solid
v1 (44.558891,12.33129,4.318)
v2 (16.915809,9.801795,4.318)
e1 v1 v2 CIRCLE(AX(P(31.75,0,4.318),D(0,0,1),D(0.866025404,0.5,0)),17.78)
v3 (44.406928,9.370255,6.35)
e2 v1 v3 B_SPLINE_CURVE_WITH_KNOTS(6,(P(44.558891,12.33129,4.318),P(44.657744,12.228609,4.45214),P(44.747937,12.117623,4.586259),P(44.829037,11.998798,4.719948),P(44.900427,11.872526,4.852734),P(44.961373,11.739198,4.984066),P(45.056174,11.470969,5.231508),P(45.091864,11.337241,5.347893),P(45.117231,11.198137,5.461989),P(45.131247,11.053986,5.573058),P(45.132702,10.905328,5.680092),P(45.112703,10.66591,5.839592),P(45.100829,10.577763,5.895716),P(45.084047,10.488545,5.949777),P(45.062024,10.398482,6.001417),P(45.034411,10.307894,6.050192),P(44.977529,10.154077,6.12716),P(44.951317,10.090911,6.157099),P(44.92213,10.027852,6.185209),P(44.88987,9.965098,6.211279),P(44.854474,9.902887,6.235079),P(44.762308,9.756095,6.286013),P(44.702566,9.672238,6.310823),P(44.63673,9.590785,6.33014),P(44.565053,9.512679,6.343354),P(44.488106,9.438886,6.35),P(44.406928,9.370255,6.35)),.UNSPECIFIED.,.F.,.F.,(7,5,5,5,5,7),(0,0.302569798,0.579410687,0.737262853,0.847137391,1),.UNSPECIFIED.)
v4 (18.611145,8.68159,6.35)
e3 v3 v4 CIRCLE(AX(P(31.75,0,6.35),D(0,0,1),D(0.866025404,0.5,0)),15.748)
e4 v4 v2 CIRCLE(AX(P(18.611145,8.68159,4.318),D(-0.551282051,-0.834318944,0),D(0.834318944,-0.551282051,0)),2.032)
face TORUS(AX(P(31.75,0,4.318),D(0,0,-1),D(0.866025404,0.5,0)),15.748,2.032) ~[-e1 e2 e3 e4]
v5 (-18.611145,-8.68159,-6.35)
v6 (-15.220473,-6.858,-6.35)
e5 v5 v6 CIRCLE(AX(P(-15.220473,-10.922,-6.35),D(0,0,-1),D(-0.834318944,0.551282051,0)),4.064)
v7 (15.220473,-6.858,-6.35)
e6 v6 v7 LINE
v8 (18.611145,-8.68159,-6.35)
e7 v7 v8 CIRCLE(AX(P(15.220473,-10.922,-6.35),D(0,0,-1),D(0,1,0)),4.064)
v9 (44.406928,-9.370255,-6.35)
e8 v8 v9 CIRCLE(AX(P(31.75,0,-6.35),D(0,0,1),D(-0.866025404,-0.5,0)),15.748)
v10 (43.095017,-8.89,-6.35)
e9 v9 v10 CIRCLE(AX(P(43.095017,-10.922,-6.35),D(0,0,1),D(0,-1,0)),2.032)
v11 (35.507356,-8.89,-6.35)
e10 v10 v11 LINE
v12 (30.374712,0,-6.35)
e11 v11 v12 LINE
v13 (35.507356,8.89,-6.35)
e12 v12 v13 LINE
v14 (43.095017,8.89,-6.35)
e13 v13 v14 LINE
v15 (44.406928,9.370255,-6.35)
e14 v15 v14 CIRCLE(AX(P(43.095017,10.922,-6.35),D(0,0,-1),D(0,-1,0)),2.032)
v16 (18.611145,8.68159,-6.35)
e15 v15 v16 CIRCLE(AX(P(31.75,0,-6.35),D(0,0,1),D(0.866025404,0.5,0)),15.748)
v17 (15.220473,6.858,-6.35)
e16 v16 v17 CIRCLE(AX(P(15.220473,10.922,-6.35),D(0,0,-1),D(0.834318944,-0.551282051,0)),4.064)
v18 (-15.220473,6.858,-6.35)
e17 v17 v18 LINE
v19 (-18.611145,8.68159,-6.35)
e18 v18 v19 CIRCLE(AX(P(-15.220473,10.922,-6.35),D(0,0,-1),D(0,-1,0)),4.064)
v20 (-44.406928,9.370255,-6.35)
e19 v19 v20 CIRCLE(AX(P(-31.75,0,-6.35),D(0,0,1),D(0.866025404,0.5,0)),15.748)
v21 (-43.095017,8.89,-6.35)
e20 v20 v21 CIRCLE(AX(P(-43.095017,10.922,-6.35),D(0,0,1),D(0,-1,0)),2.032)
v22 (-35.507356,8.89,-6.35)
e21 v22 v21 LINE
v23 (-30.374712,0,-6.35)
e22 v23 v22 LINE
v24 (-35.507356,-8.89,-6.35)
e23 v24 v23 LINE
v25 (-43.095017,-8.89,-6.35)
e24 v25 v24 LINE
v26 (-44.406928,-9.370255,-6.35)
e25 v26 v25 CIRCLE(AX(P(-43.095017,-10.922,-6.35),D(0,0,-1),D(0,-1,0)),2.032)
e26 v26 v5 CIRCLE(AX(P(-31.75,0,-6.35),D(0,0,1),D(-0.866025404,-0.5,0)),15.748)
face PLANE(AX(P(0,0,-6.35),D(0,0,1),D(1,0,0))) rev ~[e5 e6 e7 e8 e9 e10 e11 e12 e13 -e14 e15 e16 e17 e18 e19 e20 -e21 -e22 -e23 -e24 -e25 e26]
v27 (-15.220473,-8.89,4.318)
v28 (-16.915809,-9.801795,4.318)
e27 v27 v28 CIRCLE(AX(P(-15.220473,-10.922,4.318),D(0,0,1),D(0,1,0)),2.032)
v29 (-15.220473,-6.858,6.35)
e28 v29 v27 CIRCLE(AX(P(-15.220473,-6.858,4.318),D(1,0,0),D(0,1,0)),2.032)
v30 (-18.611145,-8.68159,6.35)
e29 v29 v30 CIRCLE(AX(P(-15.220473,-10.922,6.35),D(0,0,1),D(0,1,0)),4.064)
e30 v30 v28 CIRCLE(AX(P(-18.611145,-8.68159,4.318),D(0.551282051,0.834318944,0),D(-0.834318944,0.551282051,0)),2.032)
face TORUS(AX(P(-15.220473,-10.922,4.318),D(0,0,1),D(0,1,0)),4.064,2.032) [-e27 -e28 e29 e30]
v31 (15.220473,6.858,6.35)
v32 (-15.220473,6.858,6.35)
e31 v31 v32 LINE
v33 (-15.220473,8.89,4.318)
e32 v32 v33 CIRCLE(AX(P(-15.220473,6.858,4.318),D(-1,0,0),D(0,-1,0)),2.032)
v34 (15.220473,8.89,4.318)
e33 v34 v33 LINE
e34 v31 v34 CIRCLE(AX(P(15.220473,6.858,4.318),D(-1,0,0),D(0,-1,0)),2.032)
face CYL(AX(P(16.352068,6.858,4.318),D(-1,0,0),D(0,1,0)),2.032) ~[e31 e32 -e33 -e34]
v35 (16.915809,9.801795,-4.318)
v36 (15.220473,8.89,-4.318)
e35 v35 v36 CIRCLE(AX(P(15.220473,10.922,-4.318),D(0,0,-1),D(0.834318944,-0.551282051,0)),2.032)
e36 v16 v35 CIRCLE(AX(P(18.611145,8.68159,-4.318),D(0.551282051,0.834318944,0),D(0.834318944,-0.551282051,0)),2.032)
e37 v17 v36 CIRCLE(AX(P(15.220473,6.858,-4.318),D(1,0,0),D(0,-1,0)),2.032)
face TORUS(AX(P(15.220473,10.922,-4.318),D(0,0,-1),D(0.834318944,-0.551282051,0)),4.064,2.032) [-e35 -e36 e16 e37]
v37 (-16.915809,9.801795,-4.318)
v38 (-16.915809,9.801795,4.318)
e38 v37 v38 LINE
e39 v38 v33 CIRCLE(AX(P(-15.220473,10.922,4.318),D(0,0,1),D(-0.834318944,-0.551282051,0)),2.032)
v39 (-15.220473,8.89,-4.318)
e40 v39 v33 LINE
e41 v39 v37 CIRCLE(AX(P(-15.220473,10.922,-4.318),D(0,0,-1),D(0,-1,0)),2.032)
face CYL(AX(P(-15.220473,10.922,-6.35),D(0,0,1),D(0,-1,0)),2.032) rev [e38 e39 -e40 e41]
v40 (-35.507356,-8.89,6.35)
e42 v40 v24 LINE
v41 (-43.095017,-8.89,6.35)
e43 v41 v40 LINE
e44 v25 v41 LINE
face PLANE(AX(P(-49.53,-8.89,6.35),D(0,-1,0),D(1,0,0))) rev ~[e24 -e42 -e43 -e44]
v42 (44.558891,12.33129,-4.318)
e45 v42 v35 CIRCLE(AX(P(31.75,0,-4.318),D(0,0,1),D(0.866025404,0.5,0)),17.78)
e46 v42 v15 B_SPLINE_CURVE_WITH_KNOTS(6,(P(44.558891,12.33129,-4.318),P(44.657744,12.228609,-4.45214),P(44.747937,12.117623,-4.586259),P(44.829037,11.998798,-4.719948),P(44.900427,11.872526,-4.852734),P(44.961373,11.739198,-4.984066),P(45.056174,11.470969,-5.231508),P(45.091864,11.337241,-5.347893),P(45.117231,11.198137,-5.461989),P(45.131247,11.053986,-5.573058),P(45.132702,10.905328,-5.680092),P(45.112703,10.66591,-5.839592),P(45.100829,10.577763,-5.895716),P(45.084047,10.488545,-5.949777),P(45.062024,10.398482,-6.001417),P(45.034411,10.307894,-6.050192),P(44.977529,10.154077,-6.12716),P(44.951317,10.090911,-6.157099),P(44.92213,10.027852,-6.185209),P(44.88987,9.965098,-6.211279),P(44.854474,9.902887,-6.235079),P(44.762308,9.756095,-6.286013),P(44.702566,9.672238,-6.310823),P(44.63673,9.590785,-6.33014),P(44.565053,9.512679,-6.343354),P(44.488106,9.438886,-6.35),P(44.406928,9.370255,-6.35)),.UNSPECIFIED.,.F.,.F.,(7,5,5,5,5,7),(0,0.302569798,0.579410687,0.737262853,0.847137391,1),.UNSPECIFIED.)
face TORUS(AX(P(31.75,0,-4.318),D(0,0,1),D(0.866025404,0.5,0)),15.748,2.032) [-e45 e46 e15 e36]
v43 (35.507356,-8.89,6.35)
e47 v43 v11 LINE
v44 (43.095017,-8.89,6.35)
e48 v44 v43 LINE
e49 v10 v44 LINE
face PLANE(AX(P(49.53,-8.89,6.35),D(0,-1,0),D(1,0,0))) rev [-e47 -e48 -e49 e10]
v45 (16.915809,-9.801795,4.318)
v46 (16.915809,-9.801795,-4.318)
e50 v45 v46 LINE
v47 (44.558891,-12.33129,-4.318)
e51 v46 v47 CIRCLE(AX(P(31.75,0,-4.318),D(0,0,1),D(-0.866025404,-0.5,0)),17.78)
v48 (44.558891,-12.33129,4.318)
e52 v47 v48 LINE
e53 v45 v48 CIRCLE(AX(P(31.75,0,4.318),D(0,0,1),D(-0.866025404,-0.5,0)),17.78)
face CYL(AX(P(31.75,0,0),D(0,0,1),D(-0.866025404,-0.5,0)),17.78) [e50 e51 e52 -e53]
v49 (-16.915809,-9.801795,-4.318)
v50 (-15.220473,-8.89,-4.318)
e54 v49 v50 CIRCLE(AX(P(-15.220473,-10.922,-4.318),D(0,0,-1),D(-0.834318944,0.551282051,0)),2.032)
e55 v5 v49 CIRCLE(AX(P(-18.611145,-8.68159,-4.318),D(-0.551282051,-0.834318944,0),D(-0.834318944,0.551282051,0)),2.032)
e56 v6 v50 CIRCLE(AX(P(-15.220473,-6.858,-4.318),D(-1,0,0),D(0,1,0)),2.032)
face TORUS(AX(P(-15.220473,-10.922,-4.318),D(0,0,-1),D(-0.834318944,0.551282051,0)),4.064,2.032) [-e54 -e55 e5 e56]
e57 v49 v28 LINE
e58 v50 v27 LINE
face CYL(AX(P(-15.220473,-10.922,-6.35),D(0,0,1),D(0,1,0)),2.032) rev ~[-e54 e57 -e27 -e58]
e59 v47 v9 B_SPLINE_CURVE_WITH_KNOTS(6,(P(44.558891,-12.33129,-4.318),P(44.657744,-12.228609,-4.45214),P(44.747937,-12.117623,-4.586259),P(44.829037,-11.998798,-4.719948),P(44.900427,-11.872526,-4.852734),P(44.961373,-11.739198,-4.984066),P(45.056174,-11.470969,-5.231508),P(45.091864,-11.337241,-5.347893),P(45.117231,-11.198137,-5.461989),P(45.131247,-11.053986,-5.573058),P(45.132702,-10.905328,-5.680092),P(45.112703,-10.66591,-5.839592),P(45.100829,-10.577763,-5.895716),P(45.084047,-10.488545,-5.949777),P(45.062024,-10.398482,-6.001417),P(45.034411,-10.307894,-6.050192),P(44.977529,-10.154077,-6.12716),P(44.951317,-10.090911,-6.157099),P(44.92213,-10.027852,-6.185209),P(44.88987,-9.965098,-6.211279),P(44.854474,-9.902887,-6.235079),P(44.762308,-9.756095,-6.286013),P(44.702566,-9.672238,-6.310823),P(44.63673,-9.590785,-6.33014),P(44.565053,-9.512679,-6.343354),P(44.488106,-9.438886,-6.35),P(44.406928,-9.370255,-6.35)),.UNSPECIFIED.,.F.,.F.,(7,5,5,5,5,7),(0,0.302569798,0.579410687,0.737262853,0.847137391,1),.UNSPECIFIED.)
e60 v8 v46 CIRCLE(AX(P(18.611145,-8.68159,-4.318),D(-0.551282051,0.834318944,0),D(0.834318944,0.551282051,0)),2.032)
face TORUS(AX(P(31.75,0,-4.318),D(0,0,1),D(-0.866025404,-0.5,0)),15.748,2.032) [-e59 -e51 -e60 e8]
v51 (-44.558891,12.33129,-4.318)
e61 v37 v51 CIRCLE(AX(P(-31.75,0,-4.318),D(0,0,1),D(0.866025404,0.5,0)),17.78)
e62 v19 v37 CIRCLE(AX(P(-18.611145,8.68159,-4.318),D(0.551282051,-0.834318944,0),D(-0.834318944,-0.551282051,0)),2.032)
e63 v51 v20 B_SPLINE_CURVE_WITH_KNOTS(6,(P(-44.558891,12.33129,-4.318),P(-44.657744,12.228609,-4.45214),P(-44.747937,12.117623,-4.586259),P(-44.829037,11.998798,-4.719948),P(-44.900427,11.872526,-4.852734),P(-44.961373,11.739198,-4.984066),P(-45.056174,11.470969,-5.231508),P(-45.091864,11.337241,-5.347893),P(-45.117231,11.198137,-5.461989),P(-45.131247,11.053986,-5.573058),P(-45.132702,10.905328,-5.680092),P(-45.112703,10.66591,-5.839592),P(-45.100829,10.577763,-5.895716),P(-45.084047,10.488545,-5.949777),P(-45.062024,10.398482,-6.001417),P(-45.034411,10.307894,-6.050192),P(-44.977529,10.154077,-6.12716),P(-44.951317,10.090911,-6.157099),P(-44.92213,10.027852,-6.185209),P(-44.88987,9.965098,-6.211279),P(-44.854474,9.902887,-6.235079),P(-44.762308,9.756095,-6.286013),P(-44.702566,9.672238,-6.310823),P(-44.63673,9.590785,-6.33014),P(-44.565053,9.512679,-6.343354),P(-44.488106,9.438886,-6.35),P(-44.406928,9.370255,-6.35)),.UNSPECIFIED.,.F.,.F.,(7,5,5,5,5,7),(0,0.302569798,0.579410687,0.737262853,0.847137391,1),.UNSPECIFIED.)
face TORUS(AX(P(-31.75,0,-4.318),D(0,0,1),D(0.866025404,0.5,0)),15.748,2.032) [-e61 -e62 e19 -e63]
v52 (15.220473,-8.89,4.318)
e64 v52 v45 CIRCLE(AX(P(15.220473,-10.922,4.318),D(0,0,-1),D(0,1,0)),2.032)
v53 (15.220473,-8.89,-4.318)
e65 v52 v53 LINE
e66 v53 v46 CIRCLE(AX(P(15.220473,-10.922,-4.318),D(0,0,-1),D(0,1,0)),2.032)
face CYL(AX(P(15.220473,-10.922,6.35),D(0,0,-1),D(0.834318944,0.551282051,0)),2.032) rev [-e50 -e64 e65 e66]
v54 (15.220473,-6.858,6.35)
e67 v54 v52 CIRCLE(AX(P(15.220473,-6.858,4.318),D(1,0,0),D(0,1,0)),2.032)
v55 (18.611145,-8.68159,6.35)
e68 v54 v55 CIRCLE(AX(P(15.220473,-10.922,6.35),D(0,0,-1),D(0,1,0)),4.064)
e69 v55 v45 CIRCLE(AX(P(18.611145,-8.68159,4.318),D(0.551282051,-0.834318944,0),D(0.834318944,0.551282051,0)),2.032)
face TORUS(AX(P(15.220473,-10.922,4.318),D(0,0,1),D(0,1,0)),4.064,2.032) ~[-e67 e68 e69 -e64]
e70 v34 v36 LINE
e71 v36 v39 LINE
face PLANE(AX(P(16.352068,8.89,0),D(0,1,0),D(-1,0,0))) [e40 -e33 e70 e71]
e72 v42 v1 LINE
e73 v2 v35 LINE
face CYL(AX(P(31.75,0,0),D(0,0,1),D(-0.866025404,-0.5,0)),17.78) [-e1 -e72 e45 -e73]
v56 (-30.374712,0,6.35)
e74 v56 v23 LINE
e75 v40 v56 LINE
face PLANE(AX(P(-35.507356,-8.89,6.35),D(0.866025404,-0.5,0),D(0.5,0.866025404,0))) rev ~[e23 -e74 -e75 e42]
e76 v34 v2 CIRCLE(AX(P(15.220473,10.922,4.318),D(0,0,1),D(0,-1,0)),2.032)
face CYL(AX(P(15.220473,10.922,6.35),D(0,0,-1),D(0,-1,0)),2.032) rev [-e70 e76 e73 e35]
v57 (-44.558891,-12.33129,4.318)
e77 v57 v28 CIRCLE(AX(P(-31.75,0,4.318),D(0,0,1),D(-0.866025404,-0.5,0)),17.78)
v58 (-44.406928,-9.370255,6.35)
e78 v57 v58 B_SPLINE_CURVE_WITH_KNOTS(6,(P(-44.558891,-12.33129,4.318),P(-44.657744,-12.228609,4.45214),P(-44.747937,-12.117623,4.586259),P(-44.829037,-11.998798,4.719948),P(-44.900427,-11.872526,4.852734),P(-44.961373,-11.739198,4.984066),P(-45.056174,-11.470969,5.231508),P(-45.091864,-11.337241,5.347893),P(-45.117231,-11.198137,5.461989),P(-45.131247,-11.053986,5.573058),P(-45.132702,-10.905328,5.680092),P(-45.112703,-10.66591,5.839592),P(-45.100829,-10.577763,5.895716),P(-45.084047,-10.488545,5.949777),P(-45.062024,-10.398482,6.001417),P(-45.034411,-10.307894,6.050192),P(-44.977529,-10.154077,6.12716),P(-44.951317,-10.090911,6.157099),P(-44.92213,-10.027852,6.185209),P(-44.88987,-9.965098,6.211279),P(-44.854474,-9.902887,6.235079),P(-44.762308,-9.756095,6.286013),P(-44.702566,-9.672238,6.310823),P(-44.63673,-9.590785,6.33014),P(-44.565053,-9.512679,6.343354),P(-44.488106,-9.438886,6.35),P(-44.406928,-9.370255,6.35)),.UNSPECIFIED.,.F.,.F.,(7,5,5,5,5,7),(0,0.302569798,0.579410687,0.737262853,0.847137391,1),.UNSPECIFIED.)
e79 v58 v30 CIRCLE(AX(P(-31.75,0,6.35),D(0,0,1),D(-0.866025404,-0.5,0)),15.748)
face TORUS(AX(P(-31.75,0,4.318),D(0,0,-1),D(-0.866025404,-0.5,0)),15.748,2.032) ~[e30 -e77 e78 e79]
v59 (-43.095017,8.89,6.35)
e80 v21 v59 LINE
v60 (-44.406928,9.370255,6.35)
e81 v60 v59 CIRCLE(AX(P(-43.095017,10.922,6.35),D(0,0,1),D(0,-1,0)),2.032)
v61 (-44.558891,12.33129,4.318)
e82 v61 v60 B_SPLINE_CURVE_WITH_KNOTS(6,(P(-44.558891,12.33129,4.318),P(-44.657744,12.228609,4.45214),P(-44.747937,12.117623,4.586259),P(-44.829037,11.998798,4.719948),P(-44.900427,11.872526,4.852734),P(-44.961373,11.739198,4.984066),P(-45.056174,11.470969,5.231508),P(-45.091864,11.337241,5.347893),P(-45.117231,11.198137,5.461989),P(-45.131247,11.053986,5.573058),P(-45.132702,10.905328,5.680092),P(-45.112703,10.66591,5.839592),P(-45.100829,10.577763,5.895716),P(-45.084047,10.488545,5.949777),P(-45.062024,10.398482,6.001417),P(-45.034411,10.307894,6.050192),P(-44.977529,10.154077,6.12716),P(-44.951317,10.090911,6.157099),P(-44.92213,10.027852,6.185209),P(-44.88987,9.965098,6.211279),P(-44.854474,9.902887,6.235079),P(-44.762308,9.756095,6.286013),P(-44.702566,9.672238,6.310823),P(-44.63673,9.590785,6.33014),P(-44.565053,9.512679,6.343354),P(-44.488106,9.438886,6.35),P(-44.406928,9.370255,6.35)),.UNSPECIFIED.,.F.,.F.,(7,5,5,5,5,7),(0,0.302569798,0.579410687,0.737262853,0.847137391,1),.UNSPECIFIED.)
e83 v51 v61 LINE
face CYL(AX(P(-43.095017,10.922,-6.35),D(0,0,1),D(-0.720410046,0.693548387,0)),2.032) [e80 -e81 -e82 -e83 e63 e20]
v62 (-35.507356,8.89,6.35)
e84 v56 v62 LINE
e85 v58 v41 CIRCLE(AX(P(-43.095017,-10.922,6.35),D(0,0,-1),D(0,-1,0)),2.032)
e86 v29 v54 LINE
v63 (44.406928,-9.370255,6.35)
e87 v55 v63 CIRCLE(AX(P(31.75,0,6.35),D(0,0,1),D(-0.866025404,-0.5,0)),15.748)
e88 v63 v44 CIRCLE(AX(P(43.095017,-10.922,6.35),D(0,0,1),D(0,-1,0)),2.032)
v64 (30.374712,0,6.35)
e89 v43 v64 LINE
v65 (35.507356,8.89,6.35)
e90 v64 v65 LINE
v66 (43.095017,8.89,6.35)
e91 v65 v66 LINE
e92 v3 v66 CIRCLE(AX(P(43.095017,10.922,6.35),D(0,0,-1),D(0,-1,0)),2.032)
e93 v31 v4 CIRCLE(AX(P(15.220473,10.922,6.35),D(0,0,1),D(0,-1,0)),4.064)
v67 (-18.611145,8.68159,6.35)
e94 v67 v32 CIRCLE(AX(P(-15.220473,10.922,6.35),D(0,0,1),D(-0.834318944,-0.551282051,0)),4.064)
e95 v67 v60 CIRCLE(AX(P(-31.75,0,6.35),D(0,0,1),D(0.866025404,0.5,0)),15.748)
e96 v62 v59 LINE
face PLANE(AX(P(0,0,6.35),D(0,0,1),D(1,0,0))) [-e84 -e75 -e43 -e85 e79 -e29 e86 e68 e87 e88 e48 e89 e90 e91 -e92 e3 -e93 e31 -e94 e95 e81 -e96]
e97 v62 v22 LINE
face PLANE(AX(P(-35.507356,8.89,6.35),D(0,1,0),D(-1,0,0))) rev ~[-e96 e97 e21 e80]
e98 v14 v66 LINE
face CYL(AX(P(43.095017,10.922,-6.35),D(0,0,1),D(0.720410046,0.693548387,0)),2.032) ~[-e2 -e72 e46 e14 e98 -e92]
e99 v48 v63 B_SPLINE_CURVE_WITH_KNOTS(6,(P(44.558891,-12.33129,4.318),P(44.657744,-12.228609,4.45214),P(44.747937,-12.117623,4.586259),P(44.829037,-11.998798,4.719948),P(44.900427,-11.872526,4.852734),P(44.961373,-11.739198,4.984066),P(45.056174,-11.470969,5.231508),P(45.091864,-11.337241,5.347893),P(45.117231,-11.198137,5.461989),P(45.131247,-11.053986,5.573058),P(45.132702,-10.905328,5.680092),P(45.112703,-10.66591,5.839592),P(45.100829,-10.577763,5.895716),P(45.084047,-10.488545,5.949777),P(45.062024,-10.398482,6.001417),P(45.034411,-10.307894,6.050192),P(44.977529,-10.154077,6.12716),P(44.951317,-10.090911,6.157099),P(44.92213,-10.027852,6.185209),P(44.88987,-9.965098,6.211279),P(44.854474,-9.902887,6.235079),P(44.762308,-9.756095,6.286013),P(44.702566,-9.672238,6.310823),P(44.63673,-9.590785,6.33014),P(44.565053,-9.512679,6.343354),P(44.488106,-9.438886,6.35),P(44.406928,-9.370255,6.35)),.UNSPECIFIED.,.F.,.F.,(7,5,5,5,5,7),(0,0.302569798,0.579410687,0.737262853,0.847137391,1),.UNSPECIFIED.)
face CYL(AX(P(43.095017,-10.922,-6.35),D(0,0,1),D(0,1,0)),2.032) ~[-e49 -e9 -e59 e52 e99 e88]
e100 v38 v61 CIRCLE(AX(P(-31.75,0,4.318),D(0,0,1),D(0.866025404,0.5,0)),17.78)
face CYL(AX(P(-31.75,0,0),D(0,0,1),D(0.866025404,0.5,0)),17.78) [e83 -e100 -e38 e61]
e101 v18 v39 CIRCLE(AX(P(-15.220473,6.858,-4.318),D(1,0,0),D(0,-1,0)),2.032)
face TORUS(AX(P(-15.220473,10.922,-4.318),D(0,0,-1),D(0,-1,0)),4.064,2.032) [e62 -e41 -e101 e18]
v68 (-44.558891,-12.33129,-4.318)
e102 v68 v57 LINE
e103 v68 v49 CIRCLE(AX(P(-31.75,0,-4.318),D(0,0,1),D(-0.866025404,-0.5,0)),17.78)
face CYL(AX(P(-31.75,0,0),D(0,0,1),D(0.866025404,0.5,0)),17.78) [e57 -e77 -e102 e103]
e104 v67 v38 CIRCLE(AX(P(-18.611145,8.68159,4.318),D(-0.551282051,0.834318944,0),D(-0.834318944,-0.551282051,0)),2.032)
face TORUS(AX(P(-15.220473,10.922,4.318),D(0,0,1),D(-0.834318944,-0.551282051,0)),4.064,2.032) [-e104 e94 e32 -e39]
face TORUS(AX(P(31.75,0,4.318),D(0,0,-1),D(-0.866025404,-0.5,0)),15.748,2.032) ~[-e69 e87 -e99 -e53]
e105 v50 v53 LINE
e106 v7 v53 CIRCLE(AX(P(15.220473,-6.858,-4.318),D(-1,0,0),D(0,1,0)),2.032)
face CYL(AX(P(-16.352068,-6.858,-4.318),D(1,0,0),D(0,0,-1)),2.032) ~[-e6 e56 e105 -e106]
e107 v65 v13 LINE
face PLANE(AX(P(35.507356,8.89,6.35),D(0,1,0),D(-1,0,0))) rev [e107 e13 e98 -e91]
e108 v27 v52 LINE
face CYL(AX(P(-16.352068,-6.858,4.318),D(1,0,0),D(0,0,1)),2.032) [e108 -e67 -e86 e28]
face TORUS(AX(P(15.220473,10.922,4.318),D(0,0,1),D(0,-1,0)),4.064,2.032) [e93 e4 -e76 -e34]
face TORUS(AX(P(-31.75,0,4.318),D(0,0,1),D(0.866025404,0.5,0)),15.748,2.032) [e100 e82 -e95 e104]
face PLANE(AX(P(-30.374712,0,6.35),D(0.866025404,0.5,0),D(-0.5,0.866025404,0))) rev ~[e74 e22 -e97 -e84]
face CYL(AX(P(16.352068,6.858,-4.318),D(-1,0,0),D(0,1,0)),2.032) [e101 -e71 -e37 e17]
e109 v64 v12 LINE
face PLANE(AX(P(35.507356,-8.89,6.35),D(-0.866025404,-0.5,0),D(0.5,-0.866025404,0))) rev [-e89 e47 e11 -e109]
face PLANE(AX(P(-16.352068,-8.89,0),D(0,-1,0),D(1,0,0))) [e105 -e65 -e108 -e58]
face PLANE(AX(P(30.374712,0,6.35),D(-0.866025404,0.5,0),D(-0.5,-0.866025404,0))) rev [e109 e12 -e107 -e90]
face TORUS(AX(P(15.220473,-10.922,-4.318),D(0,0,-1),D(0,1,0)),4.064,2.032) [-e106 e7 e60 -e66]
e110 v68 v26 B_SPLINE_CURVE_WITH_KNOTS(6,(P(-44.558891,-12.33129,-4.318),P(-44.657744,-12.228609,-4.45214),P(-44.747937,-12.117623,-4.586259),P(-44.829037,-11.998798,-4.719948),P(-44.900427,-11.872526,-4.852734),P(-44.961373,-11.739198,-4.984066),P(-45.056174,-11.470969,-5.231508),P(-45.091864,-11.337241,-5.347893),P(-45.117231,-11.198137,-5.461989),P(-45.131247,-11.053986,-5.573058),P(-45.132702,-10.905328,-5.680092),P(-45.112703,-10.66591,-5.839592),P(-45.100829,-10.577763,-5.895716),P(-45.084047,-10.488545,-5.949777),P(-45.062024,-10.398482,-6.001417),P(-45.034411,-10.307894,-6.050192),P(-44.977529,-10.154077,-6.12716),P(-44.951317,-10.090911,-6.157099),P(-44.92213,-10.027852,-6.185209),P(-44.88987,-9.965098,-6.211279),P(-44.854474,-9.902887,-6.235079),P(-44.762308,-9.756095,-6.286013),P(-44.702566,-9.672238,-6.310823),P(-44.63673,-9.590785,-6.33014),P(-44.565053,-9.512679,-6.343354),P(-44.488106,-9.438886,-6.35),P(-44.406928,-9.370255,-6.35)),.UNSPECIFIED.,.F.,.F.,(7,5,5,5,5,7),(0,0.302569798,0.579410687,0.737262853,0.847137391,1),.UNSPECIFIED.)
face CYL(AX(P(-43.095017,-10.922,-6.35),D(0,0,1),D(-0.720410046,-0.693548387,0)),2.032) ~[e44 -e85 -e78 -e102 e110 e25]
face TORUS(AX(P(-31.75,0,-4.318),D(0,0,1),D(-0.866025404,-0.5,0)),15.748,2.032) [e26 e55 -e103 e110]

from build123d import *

# Parameters (mm, degrees)
F1_DEPTH = 6.35
F3_DEPTH = 12.701
F7_R     = 2.032


# Not quite as in the source:
# - a feature of the source that left no trace in its solid (it failed there, or was rolled back) is left out


with BuildPart() as f1:
    # F0 (on Top) → F1 (new body, symmetric)
    with BuildSketch(Plane.XY):
        with BuildLine():
            Line((16.3520683207, 8.89), (-16.3520683207, 8.89))
            ThreePointArc((-16.3520683207, 8.89), (-49.53, 0), (-16.3520683207, -8.89))
            Line((-16.3520683207, -8.89), (16.3520683207, -8.89))
            ThreePointArc((16.3520683207, -8.89), (49.53, 0), (16.3520683207, 8.89))
        make_face()
    extrude(amount=F1_DEPTH, both=True)

    # F4: F3 across plane


with BuildPart() as f3:
    # F2 (on face) → F3 (new body, through all)
    with BuildSketch(Plane.XY.offset(6.35)):
        Polygon((-35.5073561069, -8.89), (-30.3747122138, 0), (-35.5073561069, 8.89), (-45.7726438931, 8.89), (-49.53, 8.89), (-49.53, 0), (-49.53, -8.89), (-45.7726438931, -8.89), align=None)
    extrude(amount=-F3_DEPTH)


with BuildPart() as f1_1:
    add(f1.part)
    add(f3.part.mirror(Plane.YZ), mode=Mode.SUBTRACT)

    # F5: cut F3
    add(f3.part, mode=Mode.SUBTRACT)

    # F7
    f7_edges = [f1_1.edges().sort_by_distance(p)[0] for p in [
        (0, -8.89, 6.35),
        (-31.75, -17.78, 6.35),
        (-31.75, 17.78, 6.35),
        (0, 8.89, 6.35),
        (31.75, 17.78, 6.35),
        (31.75, -17.78, 6.35),
        (-31.75, -17.78, -6.35),
        (0, -8.89, -6.35),
        (31.75, -17.78, -6.35),
        (31.75, 17.78, -6.35),
        (0, 8.89, -6.35),
        (-31.75, 17.78, -6.35),
        (-16.352068, -8.89, 0),
        (16.352068, -8.89, 0),
        (-16.352068, 8.89, 0),
        (16.352068, 8.89, 0),
        (-47.147932, 8.89, 0),
        (47.147932, 8.89, 0),
        (47.147932, -8.89, 0),
        (-47.147932, -8.89, 0),
    ]]
    fillet(f7_edges, radius=F7_R)


solid = f1_1.part
